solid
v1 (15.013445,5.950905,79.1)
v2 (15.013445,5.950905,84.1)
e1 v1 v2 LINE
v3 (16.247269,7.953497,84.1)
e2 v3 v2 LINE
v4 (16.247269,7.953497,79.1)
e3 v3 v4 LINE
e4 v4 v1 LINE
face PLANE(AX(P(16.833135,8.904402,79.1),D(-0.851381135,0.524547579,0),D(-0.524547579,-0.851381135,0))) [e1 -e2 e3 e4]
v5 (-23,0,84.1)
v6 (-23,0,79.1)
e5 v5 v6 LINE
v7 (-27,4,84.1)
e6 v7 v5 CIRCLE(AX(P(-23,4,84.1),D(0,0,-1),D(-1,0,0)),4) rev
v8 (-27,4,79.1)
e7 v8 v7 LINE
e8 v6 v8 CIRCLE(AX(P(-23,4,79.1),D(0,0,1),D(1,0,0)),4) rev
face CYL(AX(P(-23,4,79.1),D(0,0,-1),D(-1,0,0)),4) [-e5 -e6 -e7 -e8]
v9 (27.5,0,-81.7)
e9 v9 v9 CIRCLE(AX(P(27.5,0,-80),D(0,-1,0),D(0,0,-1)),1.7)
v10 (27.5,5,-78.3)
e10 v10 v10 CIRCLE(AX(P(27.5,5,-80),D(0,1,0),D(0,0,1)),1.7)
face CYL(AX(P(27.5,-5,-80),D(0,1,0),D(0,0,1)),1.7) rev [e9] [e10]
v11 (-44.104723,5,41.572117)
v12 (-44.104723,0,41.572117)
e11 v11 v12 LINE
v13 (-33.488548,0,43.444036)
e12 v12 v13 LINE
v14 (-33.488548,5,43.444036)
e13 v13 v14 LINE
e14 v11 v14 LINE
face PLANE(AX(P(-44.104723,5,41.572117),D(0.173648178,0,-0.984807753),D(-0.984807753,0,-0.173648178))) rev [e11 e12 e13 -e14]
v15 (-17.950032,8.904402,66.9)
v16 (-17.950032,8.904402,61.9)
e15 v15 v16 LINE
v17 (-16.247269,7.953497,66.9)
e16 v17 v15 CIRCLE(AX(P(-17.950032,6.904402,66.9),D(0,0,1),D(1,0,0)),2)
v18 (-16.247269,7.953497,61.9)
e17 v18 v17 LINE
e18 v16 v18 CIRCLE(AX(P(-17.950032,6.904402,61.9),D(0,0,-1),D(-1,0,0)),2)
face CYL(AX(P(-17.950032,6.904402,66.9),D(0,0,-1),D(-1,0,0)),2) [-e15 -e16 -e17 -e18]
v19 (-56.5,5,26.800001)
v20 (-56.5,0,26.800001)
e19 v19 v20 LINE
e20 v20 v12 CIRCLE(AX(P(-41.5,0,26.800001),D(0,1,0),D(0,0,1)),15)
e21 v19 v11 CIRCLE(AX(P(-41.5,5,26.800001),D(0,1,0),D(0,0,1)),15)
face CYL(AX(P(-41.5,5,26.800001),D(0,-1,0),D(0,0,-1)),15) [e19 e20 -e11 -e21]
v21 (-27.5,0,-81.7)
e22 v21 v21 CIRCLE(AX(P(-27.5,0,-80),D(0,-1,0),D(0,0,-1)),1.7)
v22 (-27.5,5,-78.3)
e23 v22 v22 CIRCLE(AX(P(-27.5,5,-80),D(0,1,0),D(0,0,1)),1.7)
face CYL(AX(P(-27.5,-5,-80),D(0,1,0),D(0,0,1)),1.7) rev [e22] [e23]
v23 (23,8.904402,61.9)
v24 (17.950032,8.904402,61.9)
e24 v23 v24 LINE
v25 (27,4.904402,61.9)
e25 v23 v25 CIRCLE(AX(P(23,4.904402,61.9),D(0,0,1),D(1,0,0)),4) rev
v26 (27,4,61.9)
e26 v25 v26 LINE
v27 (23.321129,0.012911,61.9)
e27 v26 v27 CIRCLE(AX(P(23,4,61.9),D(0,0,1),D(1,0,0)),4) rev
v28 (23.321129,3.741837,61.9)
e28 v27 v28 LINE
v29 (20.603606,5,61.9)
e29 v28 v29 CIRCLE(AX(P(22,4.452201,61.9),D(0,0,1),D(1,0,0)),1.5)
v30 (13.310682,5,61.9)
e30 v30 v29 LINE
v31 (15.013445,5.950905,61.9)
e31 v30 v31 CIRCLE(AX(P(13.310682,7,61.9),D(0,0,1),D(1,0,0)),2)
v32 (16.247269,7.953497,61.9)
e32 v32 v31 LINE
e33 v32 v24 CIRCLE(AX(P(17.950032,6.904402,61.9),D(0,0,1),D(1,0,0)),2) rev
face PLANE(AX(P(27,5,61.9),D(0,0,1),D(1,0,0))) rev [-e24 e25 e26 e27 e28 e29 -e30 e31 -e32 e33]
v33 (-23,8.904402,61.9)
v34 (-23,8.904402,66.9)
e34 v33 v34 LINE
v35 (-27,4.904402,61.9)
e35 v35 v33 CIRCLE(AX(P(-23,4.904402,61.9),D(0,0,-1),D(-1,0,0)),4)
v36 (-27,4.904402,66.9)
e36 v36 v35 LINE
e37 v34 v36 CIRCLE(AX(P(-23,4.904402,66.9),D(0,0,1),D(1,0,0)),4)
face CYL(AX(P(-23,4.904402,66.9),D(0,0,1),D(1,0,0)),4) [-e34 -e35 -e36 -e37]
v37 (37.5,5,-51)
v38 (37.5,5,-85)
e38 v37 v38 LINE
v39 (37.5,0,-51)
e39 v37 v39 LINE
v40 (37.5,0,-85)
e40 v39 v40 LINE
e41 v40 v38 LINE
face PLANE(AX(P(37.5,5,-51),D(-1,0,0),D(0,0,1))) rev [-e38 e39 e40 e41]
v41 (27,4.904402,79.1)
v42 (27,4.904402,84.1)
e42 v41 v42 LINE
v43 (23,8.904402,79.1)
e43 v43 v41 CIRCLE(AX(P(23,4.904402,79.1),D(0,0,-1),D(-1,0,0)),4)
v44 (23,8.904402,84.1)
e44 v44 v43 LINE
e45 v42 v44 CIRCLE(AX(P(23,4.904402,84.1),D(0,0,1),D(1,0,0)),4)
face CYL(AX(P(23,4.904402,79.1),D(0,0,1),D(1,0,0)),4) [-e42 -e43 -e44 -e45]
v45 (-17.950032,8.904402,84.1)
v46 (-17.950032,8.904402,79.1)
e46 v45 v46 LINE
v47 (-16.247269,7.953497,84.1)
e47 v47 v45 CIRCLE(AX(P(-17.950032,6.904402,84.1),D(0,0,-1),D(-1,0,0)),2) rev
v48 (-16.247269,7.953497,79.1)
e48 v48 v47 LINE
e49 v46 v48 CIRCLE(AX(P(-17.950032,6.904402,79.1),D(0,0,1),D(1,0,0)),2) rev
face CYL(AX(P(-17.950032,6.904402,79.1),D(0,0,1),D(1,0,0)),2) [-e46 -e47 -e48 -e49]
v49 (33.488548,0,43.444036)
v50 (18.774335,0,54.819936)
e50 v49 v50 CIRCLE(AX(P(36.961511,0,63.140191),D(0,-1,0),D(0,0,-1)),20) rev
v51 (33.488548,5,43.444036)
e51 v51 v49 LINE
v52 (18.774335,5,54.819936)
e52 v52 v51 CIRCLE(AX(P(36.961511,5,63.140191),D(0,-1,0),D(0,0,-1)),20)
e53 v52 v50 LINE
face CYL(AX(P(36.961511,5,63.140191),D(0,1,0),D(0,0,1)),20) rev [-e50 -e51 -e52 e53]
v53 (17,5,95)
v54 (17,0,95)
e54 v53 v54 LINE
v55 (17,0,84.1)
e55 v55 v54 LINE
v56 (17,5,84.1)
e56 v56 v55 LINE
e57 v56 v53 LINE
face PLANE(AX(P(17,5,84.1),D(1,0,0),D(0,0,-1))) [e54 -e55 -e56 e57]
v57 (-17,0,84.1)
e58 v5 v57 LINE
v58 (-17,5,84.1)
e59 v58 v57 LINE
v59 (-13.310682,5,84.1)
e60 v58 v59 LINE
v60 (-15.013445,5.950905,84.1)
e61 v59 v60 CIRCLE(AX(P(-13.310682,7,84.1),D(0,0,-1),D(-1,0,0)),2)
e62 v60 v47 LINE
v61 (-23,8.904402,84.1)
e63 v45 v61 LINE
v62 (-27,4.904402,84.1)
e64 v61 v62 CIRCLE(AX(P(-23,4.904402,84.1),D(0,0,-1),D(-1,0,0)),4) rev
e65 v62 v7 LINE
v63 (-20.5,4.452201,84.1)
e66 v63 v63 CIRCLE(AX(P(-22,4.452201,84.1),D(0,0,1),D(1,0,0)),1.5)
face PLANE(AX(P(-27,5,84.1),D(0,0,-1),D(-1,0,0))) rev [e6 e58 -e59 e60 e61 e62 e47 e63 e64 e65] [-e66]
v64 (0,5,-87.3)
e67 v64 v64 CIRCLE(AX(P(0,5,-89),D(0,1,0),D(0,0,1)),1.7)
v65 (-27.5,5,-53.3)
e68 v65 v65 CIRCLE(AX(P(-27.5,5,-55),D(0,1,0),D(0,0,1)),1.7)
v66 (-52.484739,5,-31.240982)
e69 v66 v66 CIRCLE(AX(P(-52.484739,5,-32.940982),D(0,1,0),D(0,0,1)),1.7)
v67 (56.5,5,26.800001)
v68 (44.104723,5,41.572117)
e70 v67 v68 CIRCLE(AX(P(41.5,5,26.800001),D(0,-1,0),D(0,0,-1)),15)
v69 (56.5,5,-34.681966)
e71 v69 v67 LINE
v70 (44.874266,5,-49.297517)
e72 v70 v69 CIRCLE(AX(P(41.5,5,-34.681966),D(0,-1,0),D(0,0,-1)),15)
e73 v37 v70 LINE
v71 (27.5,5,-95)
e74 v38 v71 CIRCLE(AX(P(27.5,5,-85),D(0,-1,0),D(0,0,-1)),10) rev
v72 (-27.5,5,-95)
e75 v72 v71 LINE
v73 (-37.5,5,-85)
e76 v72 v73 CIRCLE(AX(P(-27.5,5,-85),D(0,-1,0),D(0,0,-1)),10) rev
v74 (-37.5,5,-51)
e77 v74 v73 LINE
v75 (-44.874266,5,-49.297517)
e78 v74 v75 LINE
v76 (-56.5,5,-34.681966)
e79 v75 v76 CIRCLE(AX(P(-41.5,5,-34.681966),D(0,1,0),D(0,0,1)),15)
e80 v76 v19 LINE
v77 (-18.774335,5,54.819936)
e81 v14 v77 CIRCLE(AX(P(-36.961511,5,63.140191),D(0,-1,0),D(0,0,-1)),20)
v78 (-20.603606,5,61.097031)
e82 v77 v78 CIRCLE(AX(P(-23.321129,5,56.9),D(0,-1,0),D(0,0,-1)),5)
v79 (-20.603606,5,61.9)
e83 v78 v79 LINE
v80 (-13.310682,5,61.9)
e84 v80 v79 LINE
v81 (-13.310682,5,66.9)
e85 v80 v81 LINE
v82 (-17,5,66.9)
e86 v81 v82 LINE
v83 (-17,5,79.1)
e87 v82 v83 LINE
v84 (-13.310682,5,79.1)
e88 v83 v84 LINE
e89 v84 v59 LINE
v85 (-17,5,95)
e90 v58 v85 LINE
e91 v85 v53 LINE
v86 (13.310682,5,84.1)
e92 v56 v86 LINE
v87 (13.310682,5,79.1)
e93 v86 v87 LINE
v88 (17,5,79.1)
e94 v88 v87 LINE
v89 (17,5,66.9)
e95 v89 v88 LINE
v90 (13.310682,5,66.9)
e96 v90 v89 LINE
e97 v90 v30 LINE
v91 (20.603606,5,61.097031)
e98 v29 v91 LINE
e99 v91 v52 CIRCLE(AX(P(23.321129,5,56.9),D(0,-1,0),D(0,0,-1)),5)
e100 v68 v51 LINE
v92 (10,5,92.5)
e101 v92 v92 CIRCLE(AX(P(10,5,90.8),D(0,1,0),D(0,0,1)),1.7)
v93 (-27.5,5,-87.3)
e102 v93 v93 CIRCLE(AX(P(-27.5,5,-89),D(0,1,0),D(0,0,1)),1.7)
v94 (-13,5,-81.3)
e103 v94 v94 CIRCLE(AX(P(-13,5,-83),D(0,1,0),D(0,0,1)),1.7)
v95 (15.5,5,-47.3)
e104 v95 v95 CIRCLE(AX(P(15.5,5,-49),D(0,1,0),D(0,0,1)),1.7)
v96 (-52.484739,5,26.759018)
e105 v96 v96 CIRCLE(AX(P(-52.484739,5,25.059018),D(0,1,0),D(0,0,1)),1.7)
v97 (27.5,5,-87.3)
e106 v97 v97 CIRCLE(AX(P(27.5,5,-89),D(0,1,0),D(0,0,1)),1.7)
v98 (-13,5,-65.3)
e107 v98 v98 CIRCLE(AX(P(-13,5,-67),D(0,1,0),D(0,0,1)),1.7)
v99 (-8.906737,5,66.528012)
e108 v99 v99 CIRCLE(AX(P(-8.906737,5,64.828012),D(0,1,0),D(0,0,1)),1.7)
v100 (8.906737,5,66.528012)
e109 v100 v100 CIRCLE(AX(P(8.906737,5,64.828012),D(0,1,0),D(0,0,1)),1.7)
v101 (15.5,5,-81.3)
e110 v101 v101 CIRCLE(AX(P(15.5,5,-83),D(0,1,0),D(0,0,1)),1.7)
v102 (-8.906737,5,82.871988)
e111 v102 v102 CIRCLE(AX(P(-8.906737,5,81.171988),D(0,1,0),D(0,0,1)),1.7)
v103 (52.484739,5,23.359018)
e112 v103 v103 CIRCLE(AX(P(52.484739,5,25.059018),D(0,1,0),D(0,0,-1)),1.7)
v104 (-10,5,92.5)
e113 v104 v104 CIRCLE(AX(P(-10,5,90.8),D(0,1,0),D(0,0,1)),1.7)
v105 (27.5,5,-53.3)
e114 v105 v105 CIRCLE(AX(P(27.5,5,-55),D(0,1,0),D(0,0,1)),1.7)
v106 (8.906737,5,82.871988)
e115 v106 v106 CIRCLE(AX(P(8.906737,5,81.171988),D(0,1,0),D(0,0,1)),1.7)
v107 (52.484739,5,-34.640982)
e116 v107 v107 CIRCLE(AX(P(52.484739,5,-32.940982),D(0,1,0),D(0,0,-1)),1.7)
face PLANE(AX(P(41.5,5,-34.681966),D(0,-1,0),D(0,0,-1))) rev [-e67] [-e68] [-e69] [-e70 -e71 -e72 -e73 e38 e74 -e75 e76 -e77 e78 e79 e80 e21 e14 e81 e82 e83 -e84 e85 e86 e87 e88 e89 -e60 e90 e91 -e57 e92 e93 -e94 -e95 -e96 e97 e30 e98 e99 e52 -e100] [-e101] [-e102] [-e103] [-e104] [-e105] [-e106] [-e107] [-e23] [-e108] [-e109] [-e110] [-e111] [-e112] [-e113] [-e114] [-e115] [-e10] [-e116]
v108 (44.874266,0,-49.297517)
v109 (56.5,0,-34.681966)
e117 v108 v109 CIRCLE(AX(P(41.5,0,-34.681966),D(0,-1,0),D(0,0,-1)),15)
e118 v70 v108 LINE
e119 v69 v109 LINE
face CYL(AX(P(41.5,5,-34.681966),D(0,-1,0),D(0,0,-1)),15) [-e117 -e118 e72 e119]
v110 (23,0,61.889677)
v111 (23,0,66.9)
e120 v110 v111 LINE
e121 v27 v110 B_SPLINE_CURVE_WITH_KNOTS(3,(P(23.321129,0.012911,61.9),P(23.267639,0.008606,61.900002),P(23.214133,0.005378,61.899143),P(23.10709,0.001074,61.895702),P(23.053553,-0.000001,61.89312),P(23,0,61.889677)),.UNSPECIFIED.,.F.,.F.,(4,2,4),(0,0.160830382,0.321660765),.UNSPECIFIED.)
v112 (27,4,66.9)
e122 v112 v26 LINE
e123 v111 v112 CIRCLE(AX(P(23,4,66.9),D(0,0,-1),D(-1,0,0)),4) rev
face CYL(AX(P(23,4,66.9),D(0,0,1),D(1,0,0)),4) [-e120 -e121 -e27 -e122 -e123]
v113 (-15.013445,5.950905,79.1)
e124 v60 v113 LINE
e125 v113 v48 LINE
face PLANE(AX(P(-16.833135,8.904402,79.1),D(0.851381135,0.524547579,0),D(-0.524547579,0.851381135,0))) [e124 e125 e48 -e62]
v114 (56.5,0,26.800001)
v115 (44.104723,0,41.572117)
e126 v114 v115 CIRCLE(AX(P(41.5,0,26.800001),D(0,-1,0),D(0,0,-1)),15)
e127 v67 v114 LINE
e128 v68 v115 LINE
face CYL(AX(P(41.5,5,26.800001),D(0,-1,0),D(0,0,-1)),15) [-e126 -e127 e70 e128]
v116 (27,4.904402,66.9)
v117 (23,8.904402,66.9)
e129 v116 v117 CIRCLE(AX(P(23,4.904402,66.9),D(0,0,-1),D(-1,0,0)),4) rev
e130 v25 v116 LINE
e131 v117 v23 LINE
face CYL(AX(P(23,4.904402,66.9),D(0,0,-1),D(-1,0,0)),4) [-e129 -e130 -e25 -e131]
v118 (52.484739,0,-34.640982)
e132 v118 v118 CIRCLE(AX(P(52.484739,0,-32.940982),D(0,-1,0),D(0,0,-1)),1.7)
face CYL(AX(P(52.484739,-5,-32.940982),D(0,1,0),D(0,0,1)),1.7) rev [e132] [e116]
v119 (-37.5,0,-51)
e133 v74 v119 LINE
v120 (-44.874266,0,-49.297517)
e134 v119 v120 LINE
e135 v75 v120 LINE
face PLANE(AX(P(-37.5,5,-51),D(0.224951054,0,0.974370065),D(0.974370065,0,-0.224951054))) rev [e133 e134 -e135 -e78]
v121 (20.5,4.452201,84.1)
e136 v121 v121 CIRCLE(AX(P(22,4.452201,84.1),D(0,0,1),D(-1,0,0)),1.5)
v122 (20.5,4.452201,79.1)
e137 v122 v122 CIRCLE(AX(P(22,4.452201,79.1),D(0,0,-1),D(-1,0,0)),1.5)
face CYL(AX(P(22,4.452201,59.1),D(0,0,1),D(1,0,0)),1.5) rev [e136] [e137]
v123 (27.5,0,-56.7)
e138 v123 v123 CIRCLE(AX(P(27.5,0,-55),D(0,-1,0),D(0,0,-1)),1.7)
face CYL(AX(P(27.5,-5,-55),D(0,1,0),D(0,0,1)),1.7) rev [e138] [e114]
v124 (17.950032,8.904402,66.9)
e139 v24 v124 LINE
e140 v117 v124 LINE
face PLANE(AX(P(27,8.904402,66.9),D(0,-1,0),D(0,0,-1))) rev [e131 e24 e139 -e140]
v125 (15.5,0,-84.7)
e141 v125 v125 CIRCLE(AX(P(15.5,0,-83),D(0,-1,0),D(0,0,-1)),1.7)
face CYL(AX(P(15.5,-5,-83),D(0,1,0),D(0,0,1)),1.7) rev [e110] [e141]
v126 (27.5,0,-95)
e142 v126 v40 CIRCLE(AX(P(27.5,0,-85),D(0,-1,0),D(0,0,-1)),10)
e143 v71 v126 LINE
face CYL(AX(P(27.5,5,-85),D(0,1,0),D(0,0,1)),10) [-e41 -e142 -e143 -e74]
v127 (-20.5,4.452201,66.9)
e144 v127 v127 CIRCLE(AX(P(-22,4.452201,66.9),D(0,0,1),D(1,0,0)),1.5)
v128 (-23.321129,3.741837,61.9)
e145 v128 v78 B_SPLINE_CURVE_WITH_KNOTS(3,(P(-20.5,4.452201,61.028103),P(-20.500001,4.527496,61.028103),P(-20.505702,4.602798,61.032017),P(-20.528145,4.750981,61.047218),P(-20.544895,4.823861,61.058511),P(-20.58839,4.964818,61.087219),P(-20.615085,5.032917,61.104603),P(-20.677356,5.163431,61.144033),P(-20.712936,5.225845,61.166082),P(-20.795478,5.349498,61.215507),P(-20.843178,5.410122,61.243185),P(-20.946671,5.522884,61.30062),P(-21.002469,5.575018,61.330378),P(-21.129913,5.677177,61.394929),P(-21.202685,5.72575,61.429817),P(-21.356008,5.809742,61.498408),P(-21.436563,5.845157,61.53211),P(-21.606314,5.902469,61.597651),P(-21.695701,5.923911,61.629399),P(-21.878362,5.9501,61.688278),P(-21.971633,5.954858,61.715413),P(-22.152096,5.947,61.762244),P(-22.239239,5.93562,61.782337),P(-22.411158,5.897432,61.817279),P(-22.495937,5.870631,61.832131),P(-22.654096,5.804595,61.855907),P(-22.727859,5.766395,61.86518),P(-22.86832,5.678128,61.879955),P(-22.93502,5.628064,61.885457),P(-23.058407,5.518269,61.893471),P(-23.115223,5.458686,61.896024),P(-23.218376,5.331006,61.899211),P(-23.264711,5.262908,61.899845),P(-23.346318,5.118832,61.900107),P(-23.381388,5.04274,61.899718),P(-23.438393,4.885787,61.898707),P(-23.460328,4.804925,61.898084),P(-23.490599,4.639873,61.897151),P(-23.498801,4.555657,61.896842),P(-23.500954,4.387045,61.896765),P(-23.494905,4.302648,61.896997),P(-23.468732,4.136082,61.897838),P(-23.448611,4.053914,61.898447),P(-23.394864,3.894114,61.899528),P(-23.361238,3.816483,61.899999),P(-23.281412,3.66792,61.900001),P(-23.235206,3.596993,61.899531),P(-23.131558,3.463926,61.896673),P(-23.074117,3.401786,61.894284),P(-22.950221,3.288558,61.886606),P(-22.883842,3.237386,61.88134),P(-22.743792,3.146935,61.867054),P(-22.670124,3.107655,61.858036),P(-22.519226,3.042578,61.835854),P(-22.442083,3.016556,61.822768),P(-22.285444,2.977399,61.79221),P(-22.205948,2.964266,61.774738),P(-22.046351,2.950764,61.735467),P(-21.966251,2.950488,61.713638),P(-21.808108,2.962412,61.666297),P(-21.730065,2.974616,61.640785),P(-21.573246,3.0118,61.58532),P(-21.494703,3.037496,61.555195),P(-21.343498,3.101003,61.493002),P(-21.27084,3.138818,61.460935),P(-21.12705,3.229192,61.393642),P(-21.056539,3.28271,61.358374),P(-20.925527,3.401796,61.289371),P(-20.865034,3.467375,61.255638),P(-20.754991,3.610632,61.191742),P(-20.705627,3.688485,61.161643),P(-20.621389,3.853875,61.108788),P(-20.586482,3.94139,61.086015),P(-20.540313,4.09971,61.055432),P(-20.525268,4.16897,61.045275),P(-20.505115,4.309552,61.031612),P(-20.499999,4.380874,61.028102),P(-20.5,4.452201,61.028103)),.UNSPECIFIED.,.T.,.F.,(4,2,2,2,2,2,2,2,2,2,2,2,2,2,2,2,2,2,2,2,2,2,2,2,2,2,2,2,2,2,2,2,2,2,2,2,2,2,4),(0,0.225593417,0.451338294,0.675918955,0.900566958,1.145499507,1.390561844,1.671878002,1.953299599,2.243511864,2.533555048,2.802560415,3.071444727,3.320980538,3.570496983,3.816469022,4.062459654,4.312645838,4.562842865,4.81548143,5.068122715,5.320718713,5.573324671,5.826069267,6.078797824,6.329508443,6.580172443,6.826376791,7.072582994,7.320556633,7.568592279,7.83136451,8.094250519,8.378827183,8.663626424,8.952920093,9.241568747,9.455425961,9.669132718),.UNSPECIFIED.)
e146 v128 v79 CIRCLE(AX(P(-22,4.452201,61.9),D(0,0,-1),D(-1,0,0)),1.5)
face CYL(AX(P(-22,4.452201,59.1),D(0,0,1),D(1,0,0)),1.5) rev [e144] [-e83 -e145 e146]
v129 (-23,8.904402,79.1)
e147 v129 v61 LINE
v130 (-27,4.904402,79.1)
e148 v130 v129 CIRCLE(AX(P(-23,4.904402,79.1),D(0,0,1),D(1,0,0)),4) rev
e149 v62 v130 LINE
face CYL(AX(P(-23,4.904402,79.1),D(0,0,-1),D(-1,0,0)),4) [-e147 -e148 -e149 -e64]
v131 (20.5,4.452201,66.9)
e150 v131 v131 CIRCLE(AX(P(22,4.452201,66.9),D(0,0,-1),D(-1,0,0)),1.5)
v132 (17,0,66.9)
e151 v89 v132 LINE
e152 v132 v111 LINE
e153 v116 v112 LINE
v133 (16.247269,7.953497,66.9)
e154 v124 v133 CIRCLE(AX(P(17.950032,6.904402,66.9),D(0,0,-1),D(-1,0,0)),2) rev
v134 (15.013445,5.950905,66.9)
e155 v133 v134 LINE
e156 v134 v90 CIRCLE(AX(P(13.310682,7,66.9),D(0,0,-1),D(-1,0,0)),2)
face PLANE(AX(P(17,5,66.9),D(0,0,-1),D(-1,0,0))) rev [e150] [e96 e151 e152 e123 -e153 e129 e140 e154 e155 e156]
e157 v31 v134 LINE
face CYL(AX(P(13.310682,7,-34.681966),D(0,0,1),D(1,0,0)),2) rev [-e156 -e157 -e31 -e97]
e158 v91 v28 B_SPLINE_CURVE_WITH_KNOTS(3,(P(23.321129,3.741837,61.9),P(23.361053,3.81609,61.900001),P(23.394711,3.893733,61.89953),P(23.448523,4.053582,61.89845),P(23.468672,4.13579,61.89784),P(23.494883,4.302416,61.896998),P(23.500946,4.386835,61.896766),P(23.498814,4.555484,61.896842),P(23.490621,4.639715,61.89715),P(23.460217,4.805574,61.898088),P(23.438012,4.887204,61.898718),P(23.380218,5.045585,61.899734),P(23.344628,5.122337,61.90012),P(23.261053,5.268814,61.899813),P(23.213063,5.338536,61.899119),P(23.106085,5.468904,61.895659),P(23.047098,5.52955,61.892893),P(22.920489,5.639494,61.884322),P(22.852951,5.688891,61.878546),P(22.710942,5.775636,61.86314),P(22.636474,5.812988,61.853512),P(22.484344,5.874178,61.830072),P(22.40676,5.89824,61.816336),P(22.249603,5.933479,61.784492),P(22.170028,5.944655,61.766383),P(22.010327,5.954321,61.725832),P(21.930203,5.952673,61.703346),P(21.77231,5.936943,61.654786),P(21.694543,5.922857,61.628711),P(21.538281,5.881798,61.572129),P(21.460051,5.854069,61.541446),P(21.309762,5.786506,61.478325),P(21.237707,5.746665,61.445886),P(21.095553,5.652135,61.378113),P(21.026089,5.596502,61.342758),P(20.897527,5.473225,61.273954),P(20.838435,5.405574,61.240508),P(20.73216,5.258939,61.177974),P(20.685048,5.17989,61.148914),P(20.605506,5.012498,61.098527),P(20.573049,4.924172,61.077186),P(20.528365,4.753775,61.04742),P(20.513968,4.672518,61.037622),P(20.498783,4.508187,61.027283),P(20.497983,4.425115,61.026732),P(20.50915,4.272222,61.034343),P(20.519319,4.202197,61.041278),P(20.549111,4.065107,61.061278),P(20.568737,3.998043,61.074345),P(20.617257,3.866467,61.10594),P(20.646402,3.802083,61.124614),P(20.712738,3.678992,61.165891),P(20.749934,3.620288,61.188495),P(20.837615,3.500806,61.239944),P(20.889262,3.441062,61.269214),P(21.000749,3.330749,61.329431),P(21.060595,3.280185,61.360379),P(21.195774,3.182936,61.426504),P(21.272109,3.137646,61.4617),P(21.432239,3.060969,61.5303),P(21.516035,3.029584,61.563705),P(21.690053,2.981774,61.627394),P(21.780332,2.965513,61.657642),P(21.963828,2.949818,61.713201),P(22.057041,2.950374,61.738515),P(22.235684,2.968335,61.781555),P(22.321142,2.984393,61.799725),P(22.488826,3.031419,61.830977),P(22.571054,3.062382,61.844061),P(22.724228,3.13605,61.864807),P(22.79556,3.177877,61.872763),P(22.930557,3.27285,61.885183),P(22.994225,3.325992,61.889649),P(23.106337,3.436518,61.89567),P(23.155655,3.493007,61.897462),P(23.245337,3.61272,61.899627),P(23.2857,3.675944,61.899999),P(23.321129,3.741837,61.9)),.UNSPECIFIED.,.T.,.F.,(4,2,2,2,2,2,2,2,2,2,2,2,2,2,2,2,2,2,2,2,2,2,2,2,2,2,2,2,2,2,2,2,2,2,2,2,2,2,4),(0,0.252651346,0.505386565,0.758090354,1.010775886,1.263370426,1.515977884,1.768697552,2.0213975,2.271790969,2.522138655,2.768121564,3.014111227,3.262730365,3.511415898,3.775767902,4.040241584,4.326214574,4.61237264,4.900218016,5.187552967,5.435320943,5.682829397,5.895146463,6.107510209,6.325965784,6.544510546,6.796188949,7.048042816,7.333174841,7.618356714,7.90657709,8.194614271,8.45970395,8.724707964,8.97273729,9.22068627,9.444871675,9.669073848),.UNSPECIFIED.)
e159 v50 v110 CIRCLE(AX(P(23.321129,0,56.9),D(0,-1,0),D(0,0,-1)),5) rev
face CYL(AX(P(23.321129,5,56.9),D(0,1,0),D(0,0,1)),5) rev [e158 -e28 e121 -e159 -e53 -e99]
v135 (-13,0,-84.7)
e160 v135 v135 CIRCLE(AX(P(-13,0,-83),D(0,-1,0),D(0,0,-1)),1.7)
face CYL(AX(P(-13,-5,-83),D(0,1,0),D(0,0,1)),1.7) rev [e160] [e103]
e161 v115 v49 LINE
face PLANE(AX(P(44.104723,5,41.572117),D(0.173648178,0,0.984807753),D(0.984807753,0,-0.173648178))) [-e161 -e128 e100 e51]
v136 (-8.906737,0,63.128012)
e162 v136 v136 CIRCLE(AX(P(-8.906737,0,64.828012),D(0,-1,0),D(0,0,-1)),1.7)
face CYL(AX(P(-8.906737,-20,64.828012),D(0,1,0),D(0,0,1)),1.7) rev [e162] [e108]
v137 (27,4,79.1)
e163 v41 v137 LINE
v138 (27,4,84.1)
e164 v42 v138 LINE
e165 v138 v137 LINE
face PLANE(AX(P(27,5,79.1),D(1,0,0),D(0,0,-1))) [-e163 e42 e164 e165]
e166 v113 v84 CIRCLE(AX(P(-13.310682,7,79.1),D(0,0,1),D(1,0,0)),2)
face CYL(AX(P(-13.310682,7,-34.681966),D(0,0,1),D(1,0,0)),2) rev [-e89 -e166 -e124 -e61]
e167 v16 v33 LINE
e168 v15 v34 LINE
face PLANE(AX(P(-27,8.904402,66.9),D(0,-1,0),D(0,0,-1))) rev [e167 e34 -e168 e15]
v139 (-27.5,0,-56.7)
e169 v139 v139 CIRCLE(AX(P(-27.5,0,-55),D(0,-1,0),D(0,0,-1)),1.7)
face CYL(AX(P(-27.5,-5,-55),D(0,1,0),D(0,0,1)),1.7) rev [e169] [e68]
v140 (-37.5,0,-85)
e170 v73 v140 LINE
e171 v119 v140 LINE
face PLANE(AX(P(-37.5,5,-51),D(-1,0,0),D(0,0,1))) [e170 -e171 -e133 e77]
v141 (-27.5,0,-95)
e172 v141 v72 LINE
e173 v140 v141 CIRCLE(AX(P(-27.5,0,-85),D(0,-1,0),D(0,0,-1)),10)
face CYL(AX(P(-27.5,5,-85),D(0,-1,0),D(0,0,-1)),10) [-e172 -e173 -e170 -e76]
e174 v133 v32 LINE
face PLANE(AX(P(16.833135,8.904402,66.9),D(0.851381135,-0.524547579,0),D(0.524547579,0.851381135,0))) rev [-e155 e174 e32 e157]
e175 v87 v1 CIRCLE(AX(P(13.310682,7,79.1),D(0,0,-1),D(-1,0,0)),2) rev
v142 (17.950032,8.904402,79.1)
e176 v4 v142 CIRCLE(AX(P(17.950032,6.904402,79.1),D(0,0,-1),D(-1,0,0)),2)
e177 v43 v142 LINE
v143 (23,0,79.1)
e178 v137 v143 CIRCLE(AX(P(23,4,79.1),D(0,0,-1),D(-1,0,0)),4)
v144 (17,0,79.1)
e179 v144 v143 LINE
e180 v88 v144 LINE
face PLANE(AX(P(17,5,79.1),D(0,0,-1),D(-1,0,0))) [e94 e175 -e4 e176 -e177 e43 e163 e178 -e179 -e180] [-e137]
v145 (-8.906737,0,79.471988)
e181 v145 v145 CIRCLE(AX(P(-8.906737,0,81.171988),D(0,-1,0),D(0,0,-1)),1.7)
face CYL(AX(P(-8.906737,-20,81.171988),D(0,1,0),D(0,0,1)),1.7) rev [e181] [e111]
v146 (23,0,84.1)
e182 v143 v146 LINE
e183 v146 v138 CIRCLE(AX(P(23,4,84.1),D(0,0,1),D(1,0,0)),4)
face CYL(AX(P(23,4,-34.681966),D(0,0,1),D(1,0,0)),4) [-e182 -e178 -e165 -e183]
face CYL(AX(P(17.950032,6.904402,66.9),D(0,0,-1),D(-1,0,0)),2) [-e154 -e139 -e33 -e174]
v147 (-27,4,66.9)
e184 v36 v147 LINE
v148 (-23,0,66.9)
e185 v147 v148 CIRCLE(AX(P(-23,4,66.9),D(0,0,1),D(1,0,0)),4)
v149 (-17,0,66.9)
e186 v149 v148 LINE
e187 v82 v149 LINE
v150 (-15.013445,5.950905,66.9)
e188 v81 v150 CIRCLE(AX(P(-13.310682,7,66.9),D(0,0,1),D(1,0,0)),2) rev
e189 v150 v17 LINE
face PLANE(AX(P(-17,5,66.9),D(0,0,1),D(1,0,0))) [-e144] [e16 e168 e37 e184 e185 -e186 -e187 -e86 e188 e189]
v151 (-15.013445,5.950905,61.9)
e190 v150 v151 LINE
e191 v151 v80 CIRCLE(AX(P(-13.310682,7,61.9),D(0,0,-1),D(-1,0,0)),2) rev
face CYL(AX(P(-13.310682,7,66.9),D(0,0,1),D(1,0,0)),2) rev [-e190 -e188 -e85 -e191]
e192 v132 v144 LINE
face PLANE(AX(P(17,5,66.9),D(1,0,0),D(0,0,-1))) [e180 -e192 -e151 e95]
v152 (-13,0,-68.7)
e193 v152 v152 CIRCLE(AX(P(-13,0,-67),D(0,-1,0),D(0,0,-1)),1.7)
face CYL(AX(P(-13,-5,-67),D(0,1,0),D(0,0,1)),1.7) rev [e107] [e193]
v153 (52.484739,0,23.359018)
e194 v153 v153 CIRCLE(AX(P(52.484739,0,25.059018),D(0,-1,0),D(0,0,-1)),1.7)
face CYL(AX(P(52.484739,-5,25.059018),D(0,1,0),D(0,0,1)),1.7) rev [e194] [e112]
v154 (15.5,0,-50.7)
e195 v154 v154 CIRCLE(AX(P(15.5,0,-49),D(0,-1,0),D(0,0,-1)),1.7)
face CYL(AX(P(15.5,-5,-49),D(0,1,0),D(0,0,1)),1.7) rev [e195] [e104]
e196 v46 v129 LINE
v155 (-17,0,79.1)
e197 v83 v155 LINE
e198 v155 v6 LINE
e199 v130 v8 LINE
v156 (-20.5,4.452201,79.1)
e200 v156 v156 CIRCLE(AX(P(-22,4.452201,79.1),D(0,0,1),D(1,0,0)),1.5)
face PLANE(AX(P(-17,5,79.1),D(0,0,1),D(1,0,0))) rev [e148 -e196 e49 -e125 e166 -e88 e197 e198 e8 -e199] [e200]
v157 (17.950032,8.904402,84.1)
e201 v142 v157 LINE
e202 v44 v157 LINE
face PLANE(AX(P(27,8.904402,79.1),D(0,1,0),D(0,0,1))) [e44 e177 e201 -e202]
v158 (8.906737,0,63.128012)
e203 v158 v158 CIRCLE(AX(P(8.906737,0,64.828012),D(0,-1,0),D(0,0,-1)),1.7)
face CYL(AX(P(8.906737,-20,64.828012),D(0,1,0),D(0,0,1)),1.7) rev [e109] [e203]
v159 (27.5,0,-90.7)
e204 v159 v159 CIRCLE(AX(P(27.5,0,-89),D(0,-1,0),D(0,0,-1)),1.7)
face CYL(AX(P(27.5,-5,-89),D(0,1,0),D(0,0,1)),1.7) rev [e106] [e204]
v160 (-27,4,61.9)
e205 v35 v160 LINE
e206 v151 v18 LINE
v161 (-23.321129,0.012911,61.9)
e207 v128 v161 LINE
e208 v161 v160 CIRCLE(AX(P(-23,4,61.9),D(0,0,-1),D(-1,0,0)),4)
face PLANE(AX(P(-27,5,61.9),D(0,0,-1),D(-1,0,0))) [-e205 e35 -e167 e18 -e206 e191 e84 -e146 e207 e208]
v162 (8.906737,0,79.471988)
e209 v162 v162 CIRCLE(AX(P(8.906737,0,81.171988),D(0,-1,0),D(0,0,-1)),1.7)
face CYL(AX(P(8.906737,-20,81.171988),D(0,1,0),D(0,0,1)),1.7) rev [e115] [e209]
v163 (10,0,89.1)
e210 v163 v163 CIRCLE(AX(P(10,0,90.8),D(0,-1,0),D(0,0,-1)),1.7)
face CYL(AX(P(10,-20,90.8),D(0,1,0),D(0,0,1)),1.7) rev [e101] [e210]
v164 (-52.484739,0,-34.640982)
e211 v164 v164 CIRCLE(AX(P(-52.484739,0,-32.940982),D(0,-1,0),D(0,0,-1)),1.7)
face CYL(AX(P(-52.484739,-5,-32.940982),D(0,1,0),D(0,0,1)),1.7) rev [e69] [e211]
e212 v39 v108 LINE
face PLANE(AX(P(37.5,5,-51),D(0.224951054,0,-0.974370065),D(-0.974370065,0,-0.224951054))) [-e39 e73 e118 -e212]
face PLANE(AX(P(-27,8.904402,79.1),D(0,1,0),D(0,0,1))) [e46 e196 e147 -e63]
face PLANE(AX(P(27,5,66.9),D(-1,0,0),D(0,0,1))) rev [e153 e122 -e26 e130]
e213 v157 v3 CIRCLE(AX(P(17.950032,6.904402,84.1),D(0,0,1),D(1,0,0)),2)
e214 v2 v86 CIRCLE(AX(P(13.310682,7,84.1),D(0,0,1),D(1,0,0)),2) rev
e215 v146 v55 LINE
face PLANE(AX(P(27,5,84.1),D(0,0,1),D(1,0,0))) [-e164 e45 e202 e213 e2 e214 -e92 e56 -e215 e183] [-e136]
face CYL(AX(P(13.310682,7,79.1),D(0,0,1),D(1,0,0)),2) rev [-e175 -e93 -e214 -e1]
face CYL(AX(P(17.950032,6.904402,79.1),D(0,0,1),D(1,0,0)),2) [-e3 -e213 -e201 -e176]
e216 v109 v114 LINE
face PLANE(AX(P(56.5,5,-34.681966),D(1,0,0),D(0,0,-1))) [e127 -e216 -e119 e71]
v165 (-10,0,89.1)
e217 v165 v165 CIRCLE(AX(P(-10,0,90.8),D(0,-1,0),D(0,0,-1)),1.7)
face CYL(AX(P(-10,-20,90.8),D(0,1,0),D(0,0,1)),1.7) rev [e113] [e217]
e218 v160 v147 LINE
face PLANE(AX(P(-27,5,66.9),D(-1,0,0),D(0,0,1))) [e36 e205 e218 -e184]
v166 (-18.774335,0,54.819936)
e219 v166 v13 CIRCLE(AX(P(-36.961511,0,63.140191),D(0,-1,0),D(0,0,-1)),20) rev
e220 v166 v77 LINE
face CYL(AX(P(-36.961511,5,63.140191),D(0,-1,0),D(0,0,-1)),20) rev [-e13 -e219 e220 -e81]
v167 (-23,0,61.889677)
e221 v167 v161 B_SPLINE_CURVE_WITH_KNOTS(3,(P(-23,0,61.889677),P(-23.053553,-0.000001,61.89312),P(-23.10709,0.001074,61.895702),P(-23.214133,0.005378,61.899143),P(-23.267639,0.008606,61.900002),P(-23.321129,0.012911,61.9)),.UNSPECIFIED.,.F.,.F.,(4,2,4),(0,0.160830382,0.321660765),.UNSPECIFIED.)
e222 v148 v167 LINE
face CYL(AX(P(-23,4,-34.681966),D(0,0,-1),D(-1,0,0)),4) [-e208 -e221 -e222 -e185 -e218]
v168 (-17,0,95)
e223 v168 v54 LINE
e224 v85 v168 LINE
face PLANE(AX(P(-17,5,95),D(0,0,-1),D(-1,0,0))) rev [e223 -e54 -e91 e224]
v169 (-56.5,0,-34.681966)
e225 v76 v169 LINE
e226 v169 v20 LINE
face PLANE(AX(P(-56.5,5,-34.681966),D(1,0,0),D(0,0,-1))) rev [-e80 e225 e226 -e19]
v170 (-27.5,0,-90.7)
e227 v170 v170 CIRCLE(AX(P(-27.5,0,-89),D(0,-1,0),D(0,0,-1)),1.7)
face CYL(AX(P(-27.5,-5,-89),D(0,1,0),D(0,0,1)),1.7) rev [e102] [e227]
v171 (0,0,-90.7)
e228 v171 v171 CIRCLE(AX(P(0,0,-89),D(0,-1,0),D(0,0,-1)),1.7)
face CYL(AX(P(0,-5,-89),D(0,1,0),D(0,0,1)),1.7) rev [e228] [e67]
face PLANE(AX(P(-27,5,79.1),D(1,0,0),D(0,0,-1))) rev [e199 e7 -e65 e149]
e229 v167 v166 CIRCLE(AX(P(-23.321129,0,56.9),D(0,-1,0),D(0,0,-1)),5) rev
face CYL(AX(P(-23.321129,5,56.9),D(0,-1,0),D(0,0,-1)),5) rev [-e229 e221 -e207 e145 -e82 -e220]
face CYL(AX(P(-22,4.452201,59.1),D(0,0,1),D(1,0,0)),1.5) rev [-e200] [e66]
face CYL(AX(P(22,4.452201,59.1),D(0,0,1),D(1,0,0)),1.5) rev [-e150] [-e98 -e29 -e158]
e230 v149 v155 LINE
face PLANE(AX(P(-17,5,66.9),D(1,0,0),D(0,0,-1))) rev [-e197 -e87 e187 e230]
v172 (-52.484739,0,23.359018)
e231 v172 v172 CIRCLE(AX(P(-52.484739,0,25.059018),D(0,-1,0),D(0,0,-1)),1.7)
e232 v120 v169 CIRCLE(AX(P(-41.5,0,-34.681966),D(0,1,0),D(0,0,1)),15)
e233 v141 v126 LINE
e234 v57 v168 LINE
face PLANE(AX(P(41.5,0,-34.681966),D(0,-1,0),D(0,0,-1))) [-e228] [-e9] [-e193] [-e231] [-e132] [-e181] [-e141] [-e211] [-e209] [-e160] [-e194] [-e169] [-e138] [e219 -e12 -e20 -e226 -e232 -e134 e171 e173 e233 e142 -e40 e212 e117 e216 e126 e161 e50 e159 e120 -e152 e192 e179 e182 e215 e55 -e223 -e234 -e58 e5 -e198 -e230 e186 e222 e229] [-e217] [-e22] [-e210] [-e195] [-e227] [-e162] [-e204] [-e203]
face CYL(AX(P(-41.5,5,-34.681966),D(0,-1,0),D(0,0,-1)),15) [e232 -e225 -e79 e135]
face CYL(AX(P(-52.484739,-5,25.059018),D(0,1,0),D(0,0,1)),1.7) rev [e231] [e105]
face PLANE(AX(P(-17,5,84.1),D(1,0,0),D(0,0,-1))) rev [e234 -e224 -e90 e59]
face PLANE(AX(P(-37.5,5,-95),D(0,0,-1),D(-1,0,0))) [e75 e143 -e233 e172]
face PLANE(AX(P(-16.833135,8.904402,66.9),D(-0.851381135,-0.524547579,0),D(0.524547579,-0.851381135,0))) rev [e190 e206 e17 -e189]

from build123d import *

# Parameters (mm, degrees)
BOSS_EXTRU_1_DEPTH      = 5
CONG_1_R                = 20
CONG_2_R                = 5
BOSS_EXTRU_2_DEPTH      = 5
CONG_4_R                = 2
CONG_5_R                = 4
ESQUISSE3_R             = 1.5
ENL_V_MAT_EXTRU_2_DEPTH = 25
ESQUISSE4_R             = 1.7
ENL_V_MAT_EXTRU_3_DEPTH = 25
ESQUISSE5_R             = 1.7
ENL_V_MAT_EXTRU_4_DEPTH = 10
ESQUISSE6_R             = 1.7
ENL_V_MAT_EXTRU_5_DEPTH = 10
CONG_6_R                = 10


with BuildPart() as part:
    # Esquisse1 → Boss.-Extru.1 (new body)
    with BuildSketch(Plane(origin=(0, 0, 0), x_dir=(1, 0, 0), z_dir=(0, 1, 0))):
        with BuildLine():
            Line((-37.5, 95), (37.5, 95))
            Line((37.5, 95), (37.5, 51))
            Line((37.5, 51), (44.874265815, 49.29751659))
            ThreePointArc((44.874265815, 49.29751659), (53.239122353, 44.019685168), (56.5, 34.681965619))
            Line((56.5, 34.681965619), (56.5, -26.800001164))
            ThreePointArc((56.5, -26.800001164), (52.990666647, -36.441815309), (44.104722665, -41.572117459))
            Line((44.104722665, -41.572117459), (17, -46.351411369))
            Line((17, -46.351411369), (17, -61.9))
            Line((17, -61.9), (27, -61.9))
            Line((27, -61.9), (27, -66.9))
            Line((27, -66.9), (17, -66.9))
            Line((17, -66.9), (17, -79.1))
            Line((17, -79.1), (27, -79.1))
            Line((27, -79.1), (27, -84.1))
            Line((27, -84.1), (17, -84.1))
            Line((17, -84.1), (17, -95))
            Line((17, -95), (-17, -95))
            Line((-17, -95), (-17, -84.1))
            Line((-17, -84.1), (-27, -84.1))
            Line((-27, -84.1), (-27, -79.1))
            Line((-27, -79.1), (-17, -79.1))
            Line((-17, -79.1), (-17, -66.9))
            Line((-17, -66.9), (-27, -66.9))
            Line((-27, -66.9), (-27, -61.9))
            Line((-27, -61.9), (-17, -61.9))
            Line((-17, -61.9), (-17, -46.351411369))
            Line((-17, -46.351411369), (-44.104722665, -41.572117459))
            ThreePointArc((-44.104722665, -41.572117459), (-52.990666647, -36.441815309), (-56.5, -26.800001164))
            Line((-56.5, -26.800001164), (-56.5, 34.681965619))
            ThreePointArc((-56.5, 34.681965619), (-53.239122353, 44.019685168), (-44.874265815, 49.29751659))
            Line((-44.874265815, 49.29751659), (-37.5, 51))
            Line((-37.5, 51), (-37.5, 95))
        make_face()
    extrude(amount=BOSS_EXTRU_1_DEPTH)

    # Congé1
    # the kernel refuses this fillet: 20 mm, written as the material it adds along each edge
    with BuildSketch(Plane(origin=(17, 0, 46.351411369), x_dir=(0.9848077530122094, 0, -0.1736481776669235), z_dir=(0, 1, 0))) as cong_1_piece_1:
        with BuildLine():
            CenterArc((16.742910017, -20), CONG_1_R, 90, 76.444834731)
            Line((-2.699984081, -15.312370632), (-3.088841963, -15.218618044))
            ThreePointArc((-3.088841963, -15.218618044), (-1.743915142, -7.586726045), (-0.393923101, 0.069459271))
            Line((-0.393923101, 0.069459271), (0, 0.4))
            Line((0, 0.4), (16.742910017, 0.4))
            Line((16.742910017, 0.4), (16.742910017, 0))
        make_face()
    extrude(amount=5)
    with BuildSketch(Plane(origin=(-17, 0, 46.351411369), x_dir=(0, 0, 1), z_dir=(0, 1, 0))) as cong_1_piece_2:
        with BuildLine():
            CenterArc((16.788779247, -19.961511146), CONG_1_R, 93.555165269, 76.444834731)
            Line((-2.907375813, -16.488547593), (-3.301298915, -16.419088322))
            Line((-3.301298915, -16.419088322), (-0.393923101, 0.069459271))
            Line((-0.393923101, 0.069459271), (0, 0.4))
            ThreePointArc((0, 0.4), (7.774294315, 0.4), (15.523784818, 0.399230223))
            Line((15.523784818, 0.399230223), (15.548588631, 0))
        make_face()
    extrude(amount=5)

    # Congé2
    cong_2_edges = [part.edges().sort_by_distance(p)[0] for p in [
        (-17, 2.5, 61.9),
        (17, 2.5, 61.9),
    ]]
    fillet(cong_2_edges, radius=CONG_2_R)

    # Esquisse2 → Boss.-Extru.2 (add)
    with BuildSketch(Plane.XY.offset(84.1)):
        Polygon((-27, 5), (-27, 8.904402326), (-16.833134842, 8.904402326), (-14.427579086, 5), (-14.427579086, 0), (-27, 0), align=None)
        Polygon((16.833134842, 8.904402326), (14.427579086, 5), (14.427579086, 0), (27, 0), (27, 5), (27, 8.904402326), align=None)
    boss_extru_2 = extrude(amount=-BOSS_EXTRU_2_DEPTH)

    # Symétrie1: Boss.-Extru.2 across plane
    add(boss_extru_2.mirror(Plane.XY.offset(73)))

    # Congé4
    cong_4_edges = [part.edges().sort_by_distance(p)[0] for p in [
        (16.833134842, 8.904402326, 81.6),
        (14.427579086, 5, 81.6),
        (-16.833134842, 8.904402326, 81.6),
        (-14.427579086, 5, 81.6),
        (16.833134842, 8.904402326, 64.4),
        (14.427579086, 5, 64.4),
        (-14.427579086, 5, 64.4),
        (-16.833134842, 8.904402326, 64.4),
    ]]
    fillet(cong_4_edges, radius=CONG_4_R)

    # Congé5
    cong_5_edges = [part.edges().sort_by_distance(p)[0] for p in [
        (27, 8.904402326, 81.6),
        (-27, 8.904402326, 81.6),
        (27, 8.904402326, 64.4),
        (-27, 8.904402326, 64.4),
        (-27, 0, 64.4),
        (-27, 0, 81.6),
        (27, 0, 81.6),
        (27, 0, 64.4),
    ]]
    fillet(cong_5_edges, radius=CONG_5_R)

    # Esquisse3 → Enlèv. mat.-Extru.2 (cut)
    with BuildSketch(Plane.XY.offset(84.1)):
        with Locations((-22, 4.452201163)):
            Circle(ESQUISSE3_R)
        with Locations(Location((22, 4.452201163, 0), (0, 0, 331.733302731))):
            Circle(ESQUISSE3_R)
    extrude(amount=-ENL_V_MAT_EXTRU_2_DEPTH, mode=Mode.SUBTRACT)

    # Esquisse4 → Enlèv. mat.-Extru.3 (cut)
    with BuildSketch(Plane(origin=(0, 5, 0), x_dir=(1, 0, 0), z_dir=(0, 1, 0))):
        with Locations(Location((-10, -90.8, 0), (0, 0, 270))):
            Circle(ESQUISSE4_R)
        with Locations(Location((10, -90.8, 0), (0, 0, 270))):
            Circle(ESQUISSE4_R)
        with Locations(Location((8.90673672, -64.828011588, 0), (0, 0, 270))):
            Circle(ESQUISSE4_R)
        with Locations(Location((8.90673672, -81.171988412, 0), (0, 0, 270))):
            Circle(ESQUISSE4_R)
        with Locations(Location((-8.90673672, -81.171988412, 0), (0, 0, 270))):
            Circle(ESQUISSE4_R)
        with Locations(Location((-8.90673672, -64.828011588, 0), (0, 0, 270))):
            Circle(ESQUISSE4_R)
    extrude(amount=-ENL_V_MAT_EXTRU_3_DEPTH, mode=Mode.SUBTRACT)

    # Esquisse5 → Enlèv. mat.-Extru.4 (cut)
    with BuildSketch(Plane(origin=(0, 5, 0), x_dir=(1, 0, 0), z_dir=(0, 1, 0))):
        with Locations(Location((15.5, 83, 0), (0, 0, 270))):
            Circle(ESQUISSE5_R)
        with Locations(Location((15.5, 49, 0), (0, 0, 270))):
            Circle(ESQUISSE5_R)
        with Locations(Location((-13, 83, 0), (0, 0, 270))):
            Circle(ESQUISSE5_R)
        with Locations(Location((-13, 67, 0), (0, 0, 270))):
            Circle(ESQUISSE5_R)
        with Locations(Location((27.5, 80, 0), (0, 0, 270))):
            Circle(ESQUISSE5_R)
        with Locations(Location((27.5, 55, 0), (0, 0, 270))):
            Circle(ESQUISSE5_R)
        with Locations(Location((27.5, 89, 0), (0, 0, 270))):
            Circle(ESQUISSE5_R)
        with Locations(Location((-27.5, 89, 0), (0, 0, 270))):
            Circle(ESQUISSE5_R)
        with Locations(Location((-27.5, 80, 0), (0, 0, 270))):
            Circle(ESQUISSE5_R)
        with Locations(Location((-27.5, 55, 0), (0, 0, 270))):
            Circle(ESQUISSE5_R)
        with Locations(Location((0, 89, 0), (0, 0, 270))):
            Circle(ESQUISSE5_R)
    extrude(amount=-ENL_V_MAT_EXTRU_4_DEPTH, mode=Mode.SUBTRACT)

    # Esquisse6 → Enlèv. mat.-Extru.5 (cut)
    with BuildSketch(Plane(origin=(0, 5, 0), x_dir=(1, 0, 0), z_dir=(0, 1, 0))):
        with Locations(Location((-52.484739006, 32.940982227, 0), (0, 0, 270))):
            Circle(ESQUISSE6_R)
        with Locations(Location((-52.484739006, -25.059017773, 0), (0, 0, 270))):
            Circle(ESQUISSE6_R)
        with Locations(Location((52.484739006, -25.059017773, 0), (0, 0, 90))):
            Circle(ESQUISSE6_R)
        with Locations(Location((52.484739006, 32.940982227, 0), (0, 0, 90))):
            Circle(ESQUISSE6_R)
    extrude(amount=-ENL_V_MAT_EXTRU_5_DEPTH, mode=Mode.SUBTRACT)

    # Congé6
    cong_6_edges = [part.edges().sort_by_distance(p)[0] for p in [
        (37.5, 2.5, -95),
        (-37.5, 2.5, -95),
    ]]
    fillet(cong_6_edges, radius=CONG_6_R)


solid = part.part
